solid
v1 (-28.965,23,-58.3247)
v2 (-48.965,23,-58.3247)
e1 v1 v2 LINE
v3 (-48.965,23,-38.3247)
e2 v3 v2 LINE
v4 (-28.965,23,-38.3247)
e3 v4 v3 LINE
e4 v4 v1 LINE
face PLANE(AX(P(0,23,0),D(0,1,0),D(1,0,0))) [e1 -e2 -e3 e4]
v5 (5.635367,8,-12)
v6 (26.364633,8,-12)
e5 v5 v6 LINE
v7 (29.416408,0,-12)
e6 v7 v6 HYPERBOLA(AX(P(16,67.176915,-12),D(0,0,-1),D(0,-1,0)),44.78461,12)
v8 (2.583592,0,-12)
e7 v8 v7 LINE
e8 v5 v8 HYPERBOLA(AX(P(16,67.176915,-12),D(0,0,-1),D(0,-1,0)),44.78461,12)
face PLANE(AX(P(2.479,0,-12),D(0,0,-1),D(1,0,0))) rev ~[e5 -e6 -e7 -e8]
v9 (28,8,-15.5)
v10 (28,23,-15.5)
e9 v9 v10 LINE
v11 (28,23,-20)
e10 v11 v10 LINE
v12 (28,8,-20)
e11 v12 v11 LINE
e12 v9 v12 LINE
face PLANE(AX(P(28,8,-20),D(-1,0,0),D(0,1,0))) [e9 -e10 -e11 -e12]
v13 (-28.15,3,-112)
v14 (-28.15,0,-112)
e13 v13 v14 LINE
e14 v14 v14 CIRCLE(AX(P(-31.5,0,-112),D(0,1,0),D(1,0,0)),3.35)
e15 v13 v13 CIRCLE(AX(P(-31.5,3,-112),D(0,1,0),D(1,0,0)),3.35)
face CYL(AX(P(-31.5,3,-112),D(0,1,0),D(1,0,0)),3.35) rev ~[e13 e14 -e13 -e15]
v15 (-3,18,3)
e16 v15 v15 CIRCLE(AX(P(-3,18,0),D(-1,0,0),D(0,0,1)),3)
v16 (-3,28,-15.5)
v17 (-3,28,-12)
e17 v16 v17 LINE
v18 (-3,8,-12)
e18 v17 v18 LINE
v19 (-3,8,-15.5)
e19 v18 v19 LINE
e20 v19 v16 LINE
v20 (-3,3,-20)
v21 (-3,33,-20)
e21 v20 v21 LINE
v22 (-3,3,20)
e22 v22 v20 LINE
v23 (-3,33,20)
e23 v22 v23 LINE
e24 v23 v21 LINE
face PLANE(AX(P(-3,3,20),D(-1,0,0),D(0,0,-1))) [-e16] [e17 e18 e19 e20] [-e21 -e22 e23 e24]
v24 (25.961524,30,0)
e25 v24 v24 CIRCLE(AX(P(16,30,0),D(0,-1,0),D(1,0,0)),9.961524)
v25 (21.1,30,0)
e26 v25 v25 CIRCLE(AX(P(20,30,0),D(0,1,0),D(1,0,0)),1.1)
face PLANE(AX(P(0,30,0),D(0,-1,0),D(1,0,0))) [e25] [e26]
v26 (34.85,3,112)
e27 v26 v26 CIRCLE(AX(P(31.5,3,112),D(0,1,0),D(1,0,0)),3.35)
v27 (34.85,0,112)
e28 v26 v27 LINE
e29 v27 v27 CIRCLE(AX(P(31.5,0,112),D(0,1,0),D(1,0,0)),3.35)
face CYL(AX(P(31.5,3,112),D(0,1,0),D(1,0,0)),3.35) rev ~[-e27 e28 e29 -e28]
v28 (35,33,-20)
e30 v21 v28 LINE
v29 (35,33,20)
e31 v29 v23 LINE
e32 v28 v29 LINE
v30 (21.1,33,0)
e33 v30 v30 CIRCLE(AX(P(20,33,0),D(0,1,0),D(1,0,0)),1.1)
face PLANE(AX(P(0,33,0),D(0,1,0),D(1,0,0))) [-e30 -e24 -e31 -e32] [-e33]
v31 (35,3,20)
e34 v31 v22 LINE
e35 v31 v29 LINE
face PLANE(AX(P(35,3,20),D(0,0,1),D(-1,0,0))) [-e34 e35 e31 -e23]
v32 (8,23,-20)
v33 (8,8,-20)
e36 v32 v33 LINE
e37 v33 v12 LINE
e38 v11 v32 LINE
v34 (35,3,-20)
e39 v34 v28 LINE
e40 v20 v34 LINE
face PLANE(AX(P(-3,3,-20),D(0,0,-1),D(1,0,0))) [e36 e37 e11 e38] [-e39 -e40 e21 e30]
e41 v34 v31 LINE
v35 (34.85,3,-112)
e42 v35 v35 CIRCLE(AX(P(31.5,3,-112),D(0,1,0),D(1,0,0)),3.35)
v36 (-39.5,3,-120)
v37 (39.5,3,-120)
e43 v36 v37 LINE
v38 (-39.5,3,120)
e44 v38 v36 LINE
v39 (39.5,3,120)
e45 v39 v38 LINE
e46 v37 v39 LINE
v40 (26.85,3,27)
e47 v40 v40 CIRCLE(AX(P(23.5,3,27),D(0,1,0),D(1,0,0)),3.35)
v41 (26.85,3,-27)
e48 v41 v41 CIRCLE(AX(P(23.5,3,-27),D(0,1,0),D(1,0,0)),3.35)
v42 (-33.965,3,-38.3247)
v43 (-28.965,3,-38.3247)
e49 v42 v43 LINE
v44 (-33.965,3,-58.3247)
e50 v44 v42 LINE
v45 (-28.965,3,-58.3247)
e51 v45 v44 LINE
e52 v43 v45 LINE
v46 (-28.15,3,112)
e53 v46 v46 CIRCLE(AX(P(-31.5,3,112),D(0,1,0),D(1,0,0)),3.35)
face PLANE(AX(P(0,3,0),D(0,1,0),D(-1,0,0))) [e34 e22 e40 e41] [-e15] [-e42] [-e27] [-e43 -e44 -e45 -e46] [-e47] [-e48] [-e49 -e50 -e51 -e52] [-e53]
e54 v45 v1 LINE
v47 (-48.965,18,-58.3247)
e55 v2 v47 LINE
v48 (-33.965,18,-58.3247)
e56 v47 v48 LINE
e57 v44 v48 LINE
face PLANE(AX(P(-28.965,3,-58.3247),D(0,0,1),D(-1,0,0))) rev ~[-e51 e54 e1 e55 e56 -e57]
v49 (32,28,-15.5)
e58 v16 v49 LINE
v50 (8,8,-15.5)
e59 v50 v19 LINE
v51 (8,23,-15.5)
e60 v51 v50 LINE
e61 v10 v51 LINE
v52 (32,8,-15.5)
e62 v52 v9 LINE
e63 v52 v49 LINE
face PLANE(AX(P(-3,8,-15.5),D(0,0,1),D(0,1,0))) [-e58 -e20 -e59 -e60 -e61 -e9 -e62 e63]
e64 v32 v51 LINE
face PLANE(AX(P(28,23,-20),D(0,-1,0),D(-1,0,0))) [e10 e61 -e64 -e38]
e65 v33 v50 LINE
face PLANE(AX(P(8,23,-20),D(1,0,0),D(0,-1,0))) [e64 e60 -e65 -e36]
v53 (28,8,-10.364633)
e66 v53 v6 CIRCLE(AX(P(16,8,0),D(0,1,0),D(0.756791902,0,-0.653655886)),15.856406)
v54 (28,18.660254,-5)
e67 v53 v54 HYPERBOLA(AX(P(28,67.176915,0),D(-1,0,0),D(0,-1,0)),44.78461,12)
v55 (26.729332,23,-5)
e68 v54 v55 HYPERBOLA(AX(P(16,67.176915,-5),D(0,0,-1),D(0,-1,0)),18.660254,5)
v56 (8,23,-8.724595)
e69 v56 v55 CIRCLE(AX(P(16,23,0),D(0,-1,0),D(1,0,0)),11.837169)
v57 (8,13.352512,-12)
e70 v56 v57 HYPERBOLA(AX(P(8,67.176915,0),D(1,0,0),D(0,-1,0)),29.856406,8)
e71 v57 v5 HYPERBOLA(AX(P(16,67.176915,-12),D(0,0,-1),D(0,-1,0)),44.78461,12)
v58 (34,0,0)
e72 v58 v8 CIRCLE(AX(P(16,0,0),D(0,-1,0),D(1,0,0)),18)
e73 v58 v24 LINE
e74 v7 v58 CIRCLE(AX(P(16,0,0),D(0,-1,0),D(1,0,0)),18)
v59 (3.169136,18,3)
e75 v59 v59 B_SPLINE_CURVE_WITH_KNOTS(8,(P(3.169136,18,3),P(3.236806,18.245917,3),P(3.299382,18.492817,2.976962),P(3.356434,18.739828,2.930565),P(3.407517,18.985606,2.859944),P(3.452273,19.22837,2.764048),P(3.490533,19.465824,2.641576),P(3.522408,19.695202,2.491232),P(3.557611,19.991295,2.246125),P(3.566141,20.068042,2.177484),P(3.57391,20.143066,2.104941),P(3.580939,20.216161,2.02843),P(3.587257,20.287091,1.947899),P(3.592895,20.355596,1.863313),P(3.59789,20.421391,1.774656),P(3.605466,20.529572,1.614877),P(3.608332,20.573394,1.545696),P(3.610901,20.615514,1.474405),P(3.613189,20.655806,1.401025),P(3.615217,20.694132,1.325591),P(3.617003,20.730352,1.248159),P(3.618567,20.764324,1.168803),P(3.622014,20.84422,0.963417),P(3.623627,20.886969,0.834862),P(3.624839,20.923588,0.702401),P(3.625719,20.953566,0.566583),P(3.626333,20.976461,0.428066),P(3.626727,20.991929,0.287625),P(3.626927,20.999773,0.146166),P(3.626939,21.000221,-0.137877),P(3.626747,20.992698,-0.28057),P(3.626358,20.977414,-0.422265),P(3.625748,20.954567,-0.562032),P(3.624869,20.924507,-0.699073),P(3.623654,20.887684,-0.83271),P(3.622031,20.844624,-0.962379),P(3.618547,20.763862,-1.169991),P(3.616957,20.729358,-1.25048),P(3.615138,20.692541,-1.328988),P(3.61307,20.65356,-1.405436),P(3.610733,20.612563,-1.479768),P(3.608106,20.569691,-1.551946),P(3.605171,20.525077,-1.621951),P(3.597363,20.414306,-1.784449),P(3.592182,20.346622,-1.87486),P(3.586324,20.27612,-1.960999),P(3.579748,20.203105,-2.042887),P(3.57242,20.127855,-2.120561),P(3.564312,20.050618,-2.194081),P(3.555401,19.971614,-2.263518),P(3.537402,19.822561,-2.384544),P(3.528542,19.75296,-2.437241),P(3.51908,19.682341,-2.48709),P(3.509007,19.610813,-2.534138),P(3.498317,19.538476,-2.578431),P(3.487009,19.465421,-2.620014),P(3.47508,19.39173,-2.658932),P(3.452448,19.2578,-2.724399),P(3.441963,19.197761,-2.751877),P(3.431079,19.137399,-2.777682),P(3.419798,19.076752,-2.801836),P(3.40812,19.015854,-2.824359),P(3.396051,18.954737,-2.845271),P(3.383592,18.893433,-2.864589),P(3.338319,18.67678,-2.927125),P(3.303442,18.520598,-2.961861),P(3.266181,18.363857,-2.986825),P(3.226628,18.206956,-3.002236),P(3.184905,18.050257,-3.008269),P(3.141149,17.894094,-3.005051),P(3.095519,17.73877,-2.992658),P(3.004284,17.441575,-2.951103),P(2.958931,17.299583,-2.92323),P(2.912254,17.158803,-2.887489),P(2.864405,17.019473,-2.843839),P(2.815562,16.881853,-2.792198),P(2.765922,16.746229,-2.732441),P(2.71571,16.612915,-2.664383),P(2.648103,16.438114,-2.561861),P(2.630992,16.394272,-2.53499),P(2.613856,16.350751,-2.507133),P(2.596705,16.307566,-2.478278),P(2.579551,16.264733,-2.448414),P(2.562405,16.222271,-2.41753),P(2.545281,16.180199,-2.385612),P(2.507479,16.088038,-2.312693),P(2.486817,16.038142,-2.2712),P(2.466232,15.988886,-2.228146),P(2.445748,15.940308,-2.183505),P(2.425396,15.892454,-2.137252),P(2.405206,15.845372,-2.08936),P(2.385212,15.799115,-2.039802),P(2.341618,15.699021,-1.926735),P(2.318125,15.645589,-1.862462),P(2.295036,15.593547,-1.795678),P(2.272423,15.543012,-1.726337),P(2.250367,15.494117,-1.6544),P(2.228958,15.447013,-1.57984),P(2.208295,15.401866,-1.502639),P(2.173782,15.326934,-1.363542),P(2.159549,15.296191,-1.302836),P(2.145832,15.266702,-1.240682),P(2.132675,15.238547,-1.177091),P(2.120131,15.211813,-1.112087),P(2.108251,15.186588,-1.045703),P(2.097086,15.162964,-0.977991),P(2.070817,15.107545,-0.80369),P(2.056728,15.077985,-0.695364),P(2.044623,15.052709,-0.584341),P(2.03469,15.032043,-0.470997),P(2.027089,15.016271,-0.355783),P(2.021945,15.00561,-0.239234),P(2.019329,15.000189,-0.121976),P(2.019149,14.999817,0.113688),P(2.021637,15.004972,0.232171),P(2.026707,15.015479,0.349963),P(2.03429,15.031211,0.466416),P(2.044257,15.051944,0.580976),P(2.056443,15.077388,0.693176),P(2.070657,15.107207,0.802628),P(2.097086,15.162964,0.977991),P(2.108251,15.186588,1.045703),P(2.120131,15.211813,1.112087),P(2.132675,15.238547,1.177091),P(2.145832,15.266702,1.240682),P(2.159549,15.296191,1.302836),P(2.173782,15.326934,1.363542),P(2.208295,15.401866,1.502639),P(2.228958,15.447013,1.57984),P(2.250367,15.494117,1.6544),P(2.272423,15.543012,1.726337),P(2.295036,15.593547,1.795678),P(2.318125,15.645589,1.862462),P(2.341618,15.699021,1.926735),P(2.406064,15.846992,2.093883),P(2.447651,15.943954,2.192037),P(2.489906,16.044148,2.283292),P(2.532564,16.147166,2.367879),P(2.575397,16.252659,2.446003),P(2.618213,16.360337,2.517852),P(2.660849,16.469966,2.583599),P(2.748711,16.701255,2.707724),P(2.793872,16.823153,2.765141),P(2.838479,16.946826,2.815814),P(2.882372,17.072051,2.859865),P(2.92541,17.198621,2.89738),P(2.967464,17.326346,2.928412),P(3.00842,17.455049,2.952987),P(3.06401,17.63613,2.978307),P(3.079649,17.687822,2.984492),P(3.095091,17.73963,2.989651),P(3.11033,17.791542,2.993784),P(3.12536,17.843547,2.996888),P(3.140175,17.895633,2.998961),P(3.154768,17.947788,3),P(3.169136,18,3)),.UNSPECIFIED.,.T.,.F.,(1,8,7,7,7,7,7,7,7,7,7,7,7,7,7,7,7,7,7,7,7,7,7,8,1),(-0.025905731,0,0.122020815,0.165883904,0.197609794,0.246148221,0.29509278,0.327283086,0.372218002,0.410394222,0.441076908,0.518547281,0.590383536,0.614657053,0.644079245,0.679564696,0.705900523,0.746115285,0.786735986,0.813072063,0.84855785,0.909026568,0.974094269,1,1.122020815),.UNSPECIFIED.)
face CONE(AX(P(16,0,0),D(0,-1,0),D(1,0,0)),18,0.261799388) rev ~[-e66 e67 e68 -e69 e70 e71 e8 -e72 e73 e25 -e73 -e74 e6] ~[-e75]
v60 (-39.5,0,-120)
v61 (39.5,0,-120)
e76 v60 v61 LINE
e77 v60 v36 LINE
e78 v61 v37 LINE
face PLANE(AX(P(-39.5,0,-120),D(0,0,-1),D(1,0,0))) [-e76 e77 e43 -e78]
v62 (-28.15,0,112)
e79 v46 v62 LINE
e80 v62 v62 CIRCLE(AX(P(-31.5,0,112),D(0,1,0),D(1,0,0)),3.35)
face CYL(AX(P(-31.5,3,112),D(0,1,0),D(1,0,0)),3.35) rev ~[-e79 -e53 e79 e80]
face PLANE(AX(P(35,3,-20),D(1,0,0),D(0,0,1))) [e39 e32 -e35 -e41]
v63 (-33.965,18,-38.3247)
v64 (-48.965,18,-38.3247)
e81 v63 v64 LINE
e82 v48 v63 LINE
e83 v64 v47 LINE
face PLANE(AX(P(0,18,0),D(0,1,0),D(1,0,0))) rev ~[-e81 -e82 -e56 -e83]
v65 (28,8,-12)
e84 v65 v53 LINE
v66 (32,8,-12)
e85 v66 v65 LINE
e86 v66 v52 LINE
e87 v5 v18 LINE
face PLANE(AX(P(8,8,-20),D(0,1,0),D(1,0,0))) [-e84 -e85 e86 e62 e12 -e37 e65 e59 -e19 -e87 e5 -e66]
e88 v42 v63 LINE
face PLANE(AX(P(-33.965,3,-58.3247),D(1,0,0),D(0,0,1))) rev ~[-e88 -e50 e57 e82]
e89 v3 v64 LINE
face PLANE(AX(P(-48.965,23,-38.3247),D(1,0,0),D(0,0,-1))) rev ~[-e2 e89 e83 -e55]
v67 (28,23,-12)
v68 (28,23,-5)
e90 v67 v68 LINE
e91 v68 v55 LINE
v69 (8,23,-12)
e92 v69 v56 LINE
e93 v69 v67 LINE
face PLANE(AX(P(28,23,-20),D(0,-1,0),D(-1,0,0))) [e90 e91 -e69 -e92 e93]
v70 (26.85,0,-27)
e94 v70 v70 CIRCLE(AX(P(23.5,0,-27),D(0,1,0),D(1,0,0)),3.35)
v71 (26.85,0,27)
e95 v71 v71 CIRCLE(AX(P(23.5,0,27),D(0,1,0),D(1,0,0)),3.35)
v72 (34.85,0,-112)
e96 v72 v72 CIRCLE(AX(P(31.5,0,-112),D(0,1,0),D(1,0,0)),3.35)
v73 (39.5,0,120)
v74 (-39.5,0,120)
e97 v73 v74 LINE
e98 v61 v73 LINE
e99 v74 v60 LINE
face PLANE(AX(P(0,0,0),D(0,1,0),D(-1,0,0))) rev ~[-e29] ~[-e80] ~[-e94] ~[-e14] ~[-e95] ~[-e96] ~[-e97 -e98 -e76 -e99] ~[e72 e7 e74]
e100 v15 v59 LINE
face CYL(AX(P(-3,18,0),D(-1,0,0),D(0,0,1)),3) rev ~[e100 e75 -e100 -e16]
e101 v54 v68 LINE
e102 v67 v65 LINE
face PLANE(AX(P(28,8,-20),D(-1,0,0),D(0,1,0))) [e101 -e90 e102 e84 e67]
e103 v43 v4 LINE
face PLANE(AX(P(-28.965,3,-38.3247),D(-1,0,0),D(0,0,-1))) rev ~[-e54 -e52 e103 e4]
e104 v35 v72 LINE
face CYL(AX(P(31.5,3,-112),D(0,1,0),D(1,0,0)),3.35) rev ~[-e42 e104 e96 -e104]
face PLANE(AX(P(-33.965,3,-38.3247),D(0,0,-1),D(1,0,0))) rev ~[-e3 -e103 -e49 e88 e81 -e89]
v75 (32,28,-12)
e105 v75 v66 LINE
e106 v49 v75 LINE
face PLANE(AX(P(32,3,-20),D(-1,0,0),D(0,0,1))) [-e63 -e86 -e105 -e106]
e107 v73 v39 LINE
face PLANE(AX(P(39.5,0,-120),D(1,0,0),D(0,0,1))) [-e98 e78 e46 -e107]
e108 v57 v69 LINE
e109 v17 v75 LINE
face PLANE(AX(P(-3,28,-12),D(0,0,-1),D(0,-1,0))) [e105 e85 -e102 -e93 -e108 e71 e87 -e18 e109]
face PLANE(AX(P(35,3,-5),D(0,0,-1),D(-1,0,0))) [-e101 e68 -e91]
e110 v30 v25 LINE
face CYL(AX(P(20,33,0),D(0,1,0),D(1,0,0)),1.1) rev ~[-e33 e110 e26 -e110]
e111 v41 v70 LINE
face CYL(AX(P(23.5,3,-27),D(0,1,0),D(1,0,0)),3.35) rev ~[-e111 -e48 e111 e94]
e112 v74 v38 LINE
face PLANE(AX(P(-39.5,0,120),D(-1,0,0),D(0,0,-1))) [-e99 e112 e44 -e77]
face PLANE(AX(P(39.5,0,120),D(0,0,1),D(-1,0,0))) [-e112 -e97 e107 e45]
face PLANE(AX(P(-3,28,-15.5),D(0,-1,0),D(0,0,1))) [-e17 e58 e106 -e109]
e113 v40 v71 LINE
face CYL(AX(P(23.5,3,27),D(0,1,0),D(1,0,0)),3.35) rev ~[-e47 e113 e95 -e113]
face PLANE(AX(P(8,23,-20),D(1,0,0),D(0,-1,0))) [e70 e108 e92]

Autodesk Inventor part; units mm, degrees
ref_plane "YZ Plane" through (0, 0, 0) normal (1, 0, 0) x (0, 1, 0)
ref_plane "XZ Plane" through (0, 0, 0) normal (0, 1, 0) x (-1, 0, 0)
ref_plane "XY Plane" through (0, 0, 0) normal (0, 0, 1) x (1, 0, 0)
sketch "Sketch44" plane through (0, 0, 0) normal (0, 1, 0) x (-1, 0, 0)
  line L0 (-39.5, 120) -> (39.5, 120)
  line L1 (39.5, 120) -> (39.5, -120)
  line L2 (39.5, -120) -> (-39.5, -120)
  line L3 (-39.5, -120) -> (-39.5, 120)
  line L4 (-39.5, 120) -> (39.5, -120) construction
  line L5 (39.5, 120) -> (-39.5, -120) construction
  point P0 (0, 0)
  dimension "d138" = 79
  dimension "d139" = 240
extrude "Extrusion33" add sketch "Sketch44" along normal blind 3
sketch "Sketch45" plane through (0, 3, 0) normal (0, 1, 0) x (1, 0, 0)
  line L0 (35, -20) -> (-3, -20)
  line L1 (-3, -20) -> (-3, 20)
  line L2 (-3, 20) -> (35, 20)
  line L3 (35, 20) -> (35, -20)
  point P0 (0, 0)
  dimension "d142" = 38
  dimension "d143" = 40
extrude "Extrusion34" add sketch "Sketch45" along normal blind 30
sketch "Sketch47" plane through (0, 0, 0) normal (0, -1, 0) x (1, 0, 0)
  circle A0 centre (16, 0) radius 18
  point P0 (0, 0)
  dimension "d146" = 36
extrude "Extrusion35" cut sketch "Sketch47" against normal blind 30 draft -15
sketch "Sketch58" plane through (35, 3, -20) normal (0, 0, -1) x (-1, 0, 0)
  line L0 (7, 20) -> (27, 20)
  line L1 (27, 20) -> (27, 5)
  line L2 (27, 5) -> (7, 5)
  line L3 (7, 5) -> (7, 20)
  point P0 (35, -3)
  dimension "d156" = 20
  dimension "d157" = 15
extrude "Extrusion38" cut sketch "Sketch58" against normal blind 15
sketch "Sketch59" plane through (-3, 3, -20) normal (-1, 0, 0) x (0, 0, 1)
  line L0 (4.5, 25) -> (8, 25)
  line L1 (8, 25) -> (8, 5)
  line L2 (8, 5) -> (4.5, 5)
  line L3 (4.5, 5) -> (4.5, 25)
  point P0 (20, -3)
  dimension "d160" = 3.5
  dimension "d161" = 20
extrude "Extrusion39" cut sketch "Sketch59" against normal blind 35
sketch "Sketch60" plane through (0, 3, 0) normal (0, 1, 0) x (1, 0, 0)
  line L0 (-33.965, 38.3247) -> (-28.965, 38.3247)
  line L1 (-28.965, 38.3247) -> (-28.965, 58.3247)
  line L2 (-28.965, 58.3247) -> (-33.965, 58.3247)
  line L3 (-33.965, 58.3247) -> (-33.965, 38.3247)
  point P0 (0, 0)
  dimension "d164" = 5
  dimension "d165" = 20
extrude "Extrusion40" add sketch "Sketch60" along normal blind 20
sketch "Sketch61" plane through (0, 23, 0) normal (0, 1, 0) x (1, 0, 0)
  line L0 (-28.965, 38.3247) -> (-28.965, 58.3247) projected
  line L1 (-28.965, 38.3247) -> (-48.965, 38.3247)
  line L2 (-48.965, 38.3247) -> (-48.965, 58.3247)
  line L3 (-48.965, 58.3247) -> (-28.965, 58.3247)
  line L4 (-28.965, 58.3247) -> (-28.965, 38.3247)
  point P0 (0, 0)
  dimension "d168" = 20
  dimension "d169" = 20
extrude "Extrusion41" add sketch "Sketch61" against normal blind 5
sketch "Sketch65" plane through (-3, 3, -20) normal (-1, 0, 0) x (0, 0, 1)
  circle A0 centre (20, 15) radius 3
  point P0 (20, -3)
  dimension "d176" = 6
extrude "Extrusion43" cut sketch "Sketch65" against normal blind 10
sketch "Sketch68" plane through (0, 3, 0) normal (0, 1, 0) x (1, 0, 0)
  circle A0 centre (-31.5, -112) radius 3.35
  circle A1 centre (31.5, -112) radius 3.35
  circle A2 centre (-31.5, 112) radius 3.35
  circle A3 centre (31.5, 112) radius 3.35
  point P0 (0, 0)
  dimension "d192" = 6.7
  dimension "d193" = 6.7
  dimension "d194" = 6.7
  dimension "d195" = 6.7
extrude "Extrusion46" cut sketch "Sketch68" against normal through all
sketch "Sketch69" plane through (0, 3, 0) normal (0, 1, 0) x (1, 0, 0)
  circle A0 centre (23.5, -27) radius 3.35
  circle A1 centre (23.5, 27) radius 3.35
  point P0 (0, 0)
  dimension "d198" = 6.7
  dimension "d199" = 6.7
extrude "Extrusion47" cut sketch "Sketch69" against normal through all
sketch "Sketch70" plane through (0, 0, 0) normal (0, -1, 0) x (1, 0, 0)
  line L0 (-3, -12) -> (32, -12) projected
  line L1 (2.479, -12) -> (29.6644, -12)
  line L2 (29.6644, -12) -> (29.6644, -18.105)
  line L3 (29.6644, -18.105) -> (2.479, -18.105)
  line L4 (2.479, -18.105) -> (2.479, -12)
  point P0 (0, 0)
extrude "Extrusion48" add sketch "Sketch70" against normal blind 8
sketch "Sketch71" plane through (0, 33, 0) normal (0, 1, 0) x (1, 0, 0)
  point P0 (0, 0)
sketch "Sketch73" plane through (0, 33, 0) normal (0, 1, 0) x (1, 0, 0)
  circle A0 centre (20, 0) radius 1.1
  point P0 (0, 0)
  dimension "d207" = 2.2
extrude "Extrusion50" cut sketch "Sketch73" against normal blind 10
equation "\"d193\" = d192"
equation "\"d194\" = d192"
equation "\"d195\" = d192"
equation "\"d198\" = d192"
equation "\"d199\" = d192"
properties part number "liquid port_v09"
